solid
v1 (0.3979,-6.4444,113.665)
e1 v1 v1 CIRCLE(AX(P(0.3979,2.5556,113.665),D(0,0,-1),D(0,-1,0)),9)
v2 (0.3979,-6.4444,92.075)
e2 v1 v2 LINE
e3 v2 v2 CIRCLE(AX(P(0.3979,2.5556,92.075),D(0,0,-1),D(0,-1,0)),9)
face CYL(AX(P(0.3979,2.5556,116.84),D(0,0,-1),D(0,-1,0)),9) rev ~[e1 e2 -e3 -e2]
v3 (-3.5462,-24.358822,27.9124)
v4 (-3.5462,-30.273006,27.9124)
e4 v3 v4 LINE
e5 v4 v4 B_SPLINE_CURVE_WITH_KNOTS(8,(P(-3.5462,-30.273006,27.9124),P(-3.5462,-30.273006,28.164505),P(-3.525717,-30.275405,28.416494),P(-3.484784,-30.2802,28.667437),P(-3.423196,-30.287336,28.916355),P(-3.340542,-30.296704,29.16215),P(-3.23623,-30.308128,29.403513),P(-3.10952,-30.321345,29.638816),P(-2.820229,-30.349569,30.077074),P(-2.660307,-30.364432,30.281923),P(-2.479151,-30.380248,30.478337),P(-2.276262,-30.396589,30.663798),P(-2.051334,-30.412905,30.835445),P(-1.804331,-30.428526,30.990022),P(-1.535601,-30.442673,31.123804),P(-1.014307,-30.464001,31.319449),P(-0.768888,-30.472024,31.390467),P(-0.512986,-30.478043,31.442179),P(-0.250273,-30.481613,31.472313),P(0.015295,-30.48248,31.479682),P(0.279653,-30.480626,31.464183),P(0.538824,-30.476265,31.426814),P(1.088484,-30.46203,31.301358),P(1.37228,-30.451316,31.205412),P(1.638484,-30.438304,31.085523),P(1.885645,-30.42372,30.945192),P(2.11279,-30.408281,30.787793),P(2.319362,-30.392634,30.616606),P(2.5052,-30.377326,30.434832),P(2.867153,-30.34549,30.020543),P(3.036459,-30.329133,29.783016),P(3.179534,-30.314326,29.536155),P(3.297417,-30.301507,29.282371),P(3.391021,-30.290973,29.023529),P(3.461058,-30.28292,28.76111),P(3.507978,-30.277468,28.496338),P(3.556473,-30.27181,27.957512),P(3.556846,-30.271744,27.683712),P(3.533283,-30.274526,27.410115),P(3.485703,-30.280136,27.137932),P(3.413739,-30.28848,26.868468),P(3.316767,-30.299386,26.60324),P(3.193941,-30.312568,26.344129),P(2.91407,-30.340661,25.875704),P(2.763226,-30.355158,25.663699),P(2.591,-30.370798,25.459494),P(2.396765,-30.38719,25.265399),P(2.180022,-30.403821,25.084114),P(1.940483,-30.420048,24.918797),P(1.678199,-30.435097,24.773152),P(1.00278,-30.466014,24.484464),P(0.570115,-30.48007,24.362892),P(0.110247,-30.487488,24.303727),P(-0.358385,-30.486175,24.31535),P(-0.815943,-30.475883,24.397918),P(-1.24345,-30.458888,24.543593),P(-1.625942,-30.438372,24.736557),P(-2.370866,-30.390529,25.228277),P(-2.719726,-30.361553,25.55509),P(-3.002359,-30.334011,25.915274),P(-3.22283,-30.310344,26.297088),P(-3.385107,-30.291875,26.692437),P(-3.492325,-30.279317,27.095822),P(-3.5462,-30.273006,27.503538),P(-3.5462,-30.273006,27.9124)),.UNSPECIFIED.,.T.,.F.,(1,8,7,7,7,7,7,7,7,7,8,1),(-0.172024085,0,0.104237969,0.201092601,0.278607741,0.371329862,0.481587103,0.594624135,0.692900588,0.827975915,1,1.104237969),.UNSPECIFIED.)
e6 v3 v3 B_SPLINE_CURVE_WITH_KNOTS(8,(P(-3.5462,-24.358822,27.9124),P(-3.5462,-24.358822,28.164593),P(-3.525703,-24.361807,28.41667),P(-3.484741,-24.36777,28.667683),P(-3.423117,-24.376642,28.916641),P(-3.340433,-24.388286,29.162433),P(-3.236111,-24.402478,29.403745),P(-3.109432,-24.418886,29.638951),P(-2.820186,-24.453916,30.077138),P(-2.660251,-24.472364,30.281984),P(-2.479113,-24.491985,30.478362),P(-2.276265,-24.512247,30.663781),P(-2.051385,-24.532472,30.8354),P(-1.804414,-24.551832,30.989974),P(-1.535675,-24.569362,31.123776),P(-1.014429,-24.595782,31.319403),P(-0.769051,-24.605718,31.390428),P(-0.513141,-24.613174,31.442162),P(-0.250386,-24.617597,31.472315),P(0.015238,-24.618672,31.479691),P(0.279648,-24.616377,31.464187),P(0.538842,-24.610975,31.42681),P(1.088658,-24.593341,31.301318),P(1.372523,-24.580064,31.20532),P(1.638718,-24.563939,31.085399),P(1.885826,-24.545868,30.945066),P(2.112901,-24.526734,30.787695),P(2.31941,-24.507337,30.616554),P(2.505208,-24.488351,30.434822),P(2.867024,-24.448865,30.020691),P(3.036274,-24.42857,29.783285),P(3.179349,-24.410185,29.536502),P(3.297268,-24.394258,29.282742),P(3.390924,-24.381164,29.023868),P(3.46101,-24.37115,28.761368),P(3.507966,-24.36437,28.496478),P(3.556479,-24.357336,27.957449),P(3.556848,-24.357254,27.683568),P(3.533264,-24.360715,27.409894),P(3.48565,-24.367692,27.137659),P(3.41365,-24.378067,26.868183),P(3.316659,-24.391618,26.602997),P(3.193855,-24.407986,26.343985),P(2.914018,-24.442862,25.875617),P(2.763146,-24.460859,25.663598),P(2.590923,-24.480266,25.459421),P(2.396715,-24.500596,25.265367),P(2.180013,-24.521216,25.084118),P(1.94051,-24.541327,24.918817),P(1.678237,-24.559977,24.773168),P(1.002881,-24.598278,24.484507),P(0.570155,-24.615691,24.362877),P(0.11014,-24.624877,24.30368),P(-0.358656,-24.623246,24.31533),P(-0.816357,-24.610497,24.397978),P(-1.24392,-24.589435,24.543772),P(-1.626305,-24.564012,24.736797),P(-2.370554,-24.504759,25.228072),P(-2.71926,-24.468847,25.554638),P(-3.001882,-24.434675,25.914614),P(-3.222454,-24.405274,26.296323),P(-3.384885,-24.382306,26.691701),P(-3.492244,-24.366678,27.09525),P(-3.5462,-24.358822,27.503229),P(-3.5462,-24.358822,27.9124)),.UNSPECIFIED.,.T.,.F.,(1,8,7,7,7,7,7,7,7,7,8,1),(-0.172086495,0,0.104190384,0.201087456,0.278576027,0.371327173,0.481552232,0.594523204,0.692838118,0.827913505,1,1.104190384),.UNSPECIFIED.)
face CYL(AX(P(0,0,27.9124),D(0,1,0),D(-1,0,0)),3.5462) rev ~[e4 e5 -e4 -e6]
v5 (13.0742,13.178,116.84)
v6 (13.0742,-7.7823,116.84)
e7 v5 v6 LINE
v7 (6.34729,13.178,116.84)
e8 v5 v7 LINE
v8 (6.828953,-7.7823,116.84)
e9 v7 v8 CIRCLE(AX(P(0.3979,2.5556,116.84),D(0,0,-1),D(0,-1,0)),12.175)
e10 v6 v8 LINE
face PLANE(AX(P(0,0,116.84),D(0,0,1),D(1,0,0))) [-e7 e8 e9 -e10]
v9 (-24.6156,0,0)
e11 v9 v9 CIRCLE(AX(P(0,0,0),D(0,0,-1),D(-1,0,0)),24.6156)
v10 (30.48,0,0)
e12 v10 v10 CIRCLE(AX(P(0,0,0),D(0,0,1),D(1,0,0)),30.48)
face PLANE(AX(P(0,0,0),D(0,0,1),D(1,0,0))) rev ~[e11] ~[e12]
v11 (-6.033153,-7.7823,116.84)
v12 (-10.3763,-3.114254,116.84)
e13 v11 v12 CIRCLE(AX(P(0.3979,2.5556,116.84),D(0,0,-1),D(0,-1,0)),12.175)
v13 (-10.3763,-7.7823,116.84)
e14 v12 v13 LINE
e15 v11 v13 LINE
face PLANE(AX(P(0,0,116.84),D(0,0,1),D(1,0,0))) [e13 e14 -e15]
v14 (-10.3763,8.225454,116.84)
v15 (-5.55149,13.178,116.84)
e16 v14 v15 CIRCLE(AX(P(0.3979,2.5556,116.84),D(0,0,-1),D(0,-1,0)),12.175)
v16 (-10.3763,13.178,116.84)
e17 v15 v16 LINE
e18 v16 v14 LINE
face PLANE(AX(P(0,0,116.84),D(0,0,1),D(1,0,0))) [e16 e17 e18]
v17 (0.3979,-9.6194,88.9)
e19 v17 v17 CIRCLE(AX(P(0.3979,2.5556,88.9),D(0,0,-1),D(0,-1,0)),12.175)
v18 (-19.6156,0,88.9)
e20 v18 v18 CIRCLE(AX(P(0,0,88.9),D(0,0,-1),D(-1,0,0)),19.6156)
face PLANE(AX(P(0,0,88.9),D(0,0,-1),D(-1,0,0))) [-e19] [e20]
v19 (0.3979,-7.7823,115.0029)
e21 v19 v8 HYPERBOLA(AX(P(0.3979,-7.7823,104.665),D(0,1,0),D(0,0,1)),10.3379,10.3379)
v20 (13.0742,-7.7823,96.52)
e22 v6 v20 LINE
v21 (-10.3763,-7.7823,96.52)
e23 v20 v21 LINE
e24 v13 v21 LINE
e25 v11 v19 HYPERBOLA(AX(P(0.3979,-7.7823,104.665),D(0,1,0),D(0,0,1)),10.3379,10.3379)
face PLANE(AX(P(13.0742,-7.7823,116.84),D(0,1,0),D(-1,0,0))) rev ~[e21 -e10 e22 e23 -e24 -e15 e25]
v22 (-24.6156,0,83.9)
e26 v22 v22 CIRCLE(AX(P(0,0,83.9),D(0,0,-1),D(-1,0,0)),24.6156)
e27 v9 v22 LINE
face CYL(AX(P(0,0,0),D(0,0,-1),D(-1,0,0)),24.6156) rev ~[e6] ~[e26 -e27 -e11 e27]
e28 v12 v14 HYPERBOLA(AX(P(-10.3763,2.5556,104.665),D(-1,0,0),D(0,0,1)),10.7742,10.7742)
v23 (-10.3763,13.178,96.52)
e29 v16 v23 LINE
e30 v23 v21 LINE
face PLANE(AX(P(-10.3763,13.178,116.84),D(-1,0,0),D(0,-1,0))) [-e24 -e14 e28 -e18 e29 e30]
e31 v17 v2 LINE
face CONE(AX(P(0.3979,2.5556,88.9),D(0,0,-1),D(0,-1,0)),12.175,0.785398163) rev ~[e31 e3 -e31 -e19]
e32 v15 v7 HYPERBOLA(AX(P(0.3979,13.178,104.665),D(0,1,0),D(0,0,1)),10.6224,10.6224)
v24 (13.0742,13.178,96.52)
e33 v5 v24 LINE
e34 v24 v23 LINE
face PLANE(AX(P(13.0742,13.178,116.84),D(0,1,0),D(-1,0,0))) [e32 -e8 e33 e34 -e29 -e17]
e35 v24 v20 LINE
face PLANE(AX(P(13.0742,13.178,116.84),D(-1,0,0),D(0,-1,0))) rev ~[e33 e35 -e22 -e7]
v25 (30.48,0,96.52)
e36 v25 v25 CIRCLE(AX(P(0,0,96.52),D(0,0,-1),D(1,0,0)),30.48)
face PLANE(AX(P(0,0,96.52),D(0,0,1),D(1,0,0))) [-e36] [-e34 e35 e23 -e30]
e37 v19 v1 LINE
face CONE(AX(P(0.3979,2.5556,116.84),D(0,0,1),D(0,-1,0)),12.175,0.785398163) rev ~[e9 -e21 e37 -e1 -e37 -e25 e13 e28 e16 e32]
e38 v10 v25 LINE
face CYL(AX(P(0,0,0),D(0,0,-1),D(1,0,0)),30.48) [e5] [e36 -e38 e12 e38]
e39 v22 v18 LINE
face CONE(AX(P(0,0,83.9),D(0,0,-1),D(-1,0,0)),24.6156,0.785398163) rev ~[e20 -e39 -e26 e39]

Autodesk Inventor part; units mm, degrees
ref_plane "YZ Plane" through (0, 0, 0) normal (1, 0, 0) x (0, 1, 0)
ref_plane "XZ Plane" through (0, 0, 0) normal (0, 1, 0) x (-1, 0, 0)
ref_plane "XY Plane" through (0, 0, 0) normal (0, 0, 1) x (1, 0, 0)
sketch "Sketch1" plane through (0, 0, 0) normal (1, 0, 0) x (0, 1, 0)
  point P0 (0, 0)
sketch "Sketch2" plane through (0, 0, 0) normal (0, 0, 1) x (1, 0, 0)
  circle A0 centre (0, 0) radius 30.48
  dimension "d0" = 60.96
extrude "Extrusion1" add sketch "Sketch2" along normal blind 116.84
sketch "Sketch3" plane through (0, 0, 116.84) normal (0, 0, 1) x (1, 0, 0)
  line L0 (-39.8452, 52.8156) -> (35.072, 52.8156)
  line L1 (35.072, 52.8156) -> (35.072, 13.178)
  line L2 (35.072, 13.178) -> (-39.8452, 13.178)
  line L3 (-39.8452, 13.178) -> (-39.8452, 52.8156)
  line L4 (-67.2387, 32.9968) -> (-10.3763, 32.9968)
  line L5 (-10.3763, 32.9968) -> (-10.3763, -41.1941)
  line L6 (-10.3763, -41.1941) -> (-67.2387, -41.1941)
  line L7 (-67.2387, -41.1941) -> (-67.2387, 32.9968)
  line L8 (-33.6194, -53.8532) -> (43.5806, -53.8532)
  line L9 (43.5806, -53.8532) -> (43.5806, -7.7823)
  line L10 (43.5806, -7.7823) -> (-33.6194, -7.7823)
  line L11 (-33.6194, -7.7823) -> (-33.6194, -53.8532)
  line L12 (52.9193, 35.3833) -> (13.0742, 35.3833)
  line L13 (13.0742, 35.3833) -> (13.0742, -35.1758)
  line L14 (13.0742, -35.1758) -> (52.9193, -35.1758)
  line L15 (52.9193, -35.1758) -> (52.9193, 35.3833)
  point P0 (0, 0)
  point P1 (-10.3763, 13.178)
  point P2 (13.0742, 13.178)
  point P3 (13.0742, -7.7823)
  point P4 (-10.3763, -7.7823)
  point P5 (-39.8452, 32.9968)
  point P6 (-33.6194, -41.1941)
  point P7 (43.5806, -35.1758)
  point P8 (35.072, 35.3833)
extrude "Extrusion2" cut sketch "Sketch3" against normal blind 20.32 contours L0 L1 L12 L13 L2 L5 L4 L3 | L4 L5 L2 L3 | L3 L2 L5 L10 L11 L6 L7 L4 | L12 L15 L14 L9 L10 L13 L2 L1 | L1 L2 L13 L12 | L10 L13 L14 L9 L8 L11 L6 L5 | L5 L6 L11 L10 | L10 L9 L14 L13
sketch "Sketch4" plane through (0, 0, 116.84) normal (0, 0, 1) x (1, 0, 0)
  point P0 (0, 0)
  point P1 (0.3979, 2.5556)
hole "Hole1" at (0.3979, 2.5556, 116.84) direction (0, 0, -1) diameter 18 end through all
sketch "Sketch5" plane through (0, 0, 0) normal (0, 0, -1) x (-1, 0, 0)
  circle A0 centre (0, 0) radius 24.6156
extrude "Extrusion3" cut sketch "Sketch5" against normal blind 88.9
chamfer "Chamfer1" distance 3.175 angle 45 2 edges at (0.3979, 11.5556, 88.9) (0.3979, 11.5556, 116.84)
chamfer "Chamfer2" distance 5 angle 45 1 edges at (24.6156, 0, 88.9)
sketch "Sketch6" plane through (0, 0, 0) normal (0, 1, 0) x (-1, 0, 0)
  circle A0 centre (0, 27.9124) radius 3.5462
  point P0 (0, 0)
extrude "Extrusion4" cut sketch "Sketch6" against normal blind 88.9
properties part number "storage pipe 2"
